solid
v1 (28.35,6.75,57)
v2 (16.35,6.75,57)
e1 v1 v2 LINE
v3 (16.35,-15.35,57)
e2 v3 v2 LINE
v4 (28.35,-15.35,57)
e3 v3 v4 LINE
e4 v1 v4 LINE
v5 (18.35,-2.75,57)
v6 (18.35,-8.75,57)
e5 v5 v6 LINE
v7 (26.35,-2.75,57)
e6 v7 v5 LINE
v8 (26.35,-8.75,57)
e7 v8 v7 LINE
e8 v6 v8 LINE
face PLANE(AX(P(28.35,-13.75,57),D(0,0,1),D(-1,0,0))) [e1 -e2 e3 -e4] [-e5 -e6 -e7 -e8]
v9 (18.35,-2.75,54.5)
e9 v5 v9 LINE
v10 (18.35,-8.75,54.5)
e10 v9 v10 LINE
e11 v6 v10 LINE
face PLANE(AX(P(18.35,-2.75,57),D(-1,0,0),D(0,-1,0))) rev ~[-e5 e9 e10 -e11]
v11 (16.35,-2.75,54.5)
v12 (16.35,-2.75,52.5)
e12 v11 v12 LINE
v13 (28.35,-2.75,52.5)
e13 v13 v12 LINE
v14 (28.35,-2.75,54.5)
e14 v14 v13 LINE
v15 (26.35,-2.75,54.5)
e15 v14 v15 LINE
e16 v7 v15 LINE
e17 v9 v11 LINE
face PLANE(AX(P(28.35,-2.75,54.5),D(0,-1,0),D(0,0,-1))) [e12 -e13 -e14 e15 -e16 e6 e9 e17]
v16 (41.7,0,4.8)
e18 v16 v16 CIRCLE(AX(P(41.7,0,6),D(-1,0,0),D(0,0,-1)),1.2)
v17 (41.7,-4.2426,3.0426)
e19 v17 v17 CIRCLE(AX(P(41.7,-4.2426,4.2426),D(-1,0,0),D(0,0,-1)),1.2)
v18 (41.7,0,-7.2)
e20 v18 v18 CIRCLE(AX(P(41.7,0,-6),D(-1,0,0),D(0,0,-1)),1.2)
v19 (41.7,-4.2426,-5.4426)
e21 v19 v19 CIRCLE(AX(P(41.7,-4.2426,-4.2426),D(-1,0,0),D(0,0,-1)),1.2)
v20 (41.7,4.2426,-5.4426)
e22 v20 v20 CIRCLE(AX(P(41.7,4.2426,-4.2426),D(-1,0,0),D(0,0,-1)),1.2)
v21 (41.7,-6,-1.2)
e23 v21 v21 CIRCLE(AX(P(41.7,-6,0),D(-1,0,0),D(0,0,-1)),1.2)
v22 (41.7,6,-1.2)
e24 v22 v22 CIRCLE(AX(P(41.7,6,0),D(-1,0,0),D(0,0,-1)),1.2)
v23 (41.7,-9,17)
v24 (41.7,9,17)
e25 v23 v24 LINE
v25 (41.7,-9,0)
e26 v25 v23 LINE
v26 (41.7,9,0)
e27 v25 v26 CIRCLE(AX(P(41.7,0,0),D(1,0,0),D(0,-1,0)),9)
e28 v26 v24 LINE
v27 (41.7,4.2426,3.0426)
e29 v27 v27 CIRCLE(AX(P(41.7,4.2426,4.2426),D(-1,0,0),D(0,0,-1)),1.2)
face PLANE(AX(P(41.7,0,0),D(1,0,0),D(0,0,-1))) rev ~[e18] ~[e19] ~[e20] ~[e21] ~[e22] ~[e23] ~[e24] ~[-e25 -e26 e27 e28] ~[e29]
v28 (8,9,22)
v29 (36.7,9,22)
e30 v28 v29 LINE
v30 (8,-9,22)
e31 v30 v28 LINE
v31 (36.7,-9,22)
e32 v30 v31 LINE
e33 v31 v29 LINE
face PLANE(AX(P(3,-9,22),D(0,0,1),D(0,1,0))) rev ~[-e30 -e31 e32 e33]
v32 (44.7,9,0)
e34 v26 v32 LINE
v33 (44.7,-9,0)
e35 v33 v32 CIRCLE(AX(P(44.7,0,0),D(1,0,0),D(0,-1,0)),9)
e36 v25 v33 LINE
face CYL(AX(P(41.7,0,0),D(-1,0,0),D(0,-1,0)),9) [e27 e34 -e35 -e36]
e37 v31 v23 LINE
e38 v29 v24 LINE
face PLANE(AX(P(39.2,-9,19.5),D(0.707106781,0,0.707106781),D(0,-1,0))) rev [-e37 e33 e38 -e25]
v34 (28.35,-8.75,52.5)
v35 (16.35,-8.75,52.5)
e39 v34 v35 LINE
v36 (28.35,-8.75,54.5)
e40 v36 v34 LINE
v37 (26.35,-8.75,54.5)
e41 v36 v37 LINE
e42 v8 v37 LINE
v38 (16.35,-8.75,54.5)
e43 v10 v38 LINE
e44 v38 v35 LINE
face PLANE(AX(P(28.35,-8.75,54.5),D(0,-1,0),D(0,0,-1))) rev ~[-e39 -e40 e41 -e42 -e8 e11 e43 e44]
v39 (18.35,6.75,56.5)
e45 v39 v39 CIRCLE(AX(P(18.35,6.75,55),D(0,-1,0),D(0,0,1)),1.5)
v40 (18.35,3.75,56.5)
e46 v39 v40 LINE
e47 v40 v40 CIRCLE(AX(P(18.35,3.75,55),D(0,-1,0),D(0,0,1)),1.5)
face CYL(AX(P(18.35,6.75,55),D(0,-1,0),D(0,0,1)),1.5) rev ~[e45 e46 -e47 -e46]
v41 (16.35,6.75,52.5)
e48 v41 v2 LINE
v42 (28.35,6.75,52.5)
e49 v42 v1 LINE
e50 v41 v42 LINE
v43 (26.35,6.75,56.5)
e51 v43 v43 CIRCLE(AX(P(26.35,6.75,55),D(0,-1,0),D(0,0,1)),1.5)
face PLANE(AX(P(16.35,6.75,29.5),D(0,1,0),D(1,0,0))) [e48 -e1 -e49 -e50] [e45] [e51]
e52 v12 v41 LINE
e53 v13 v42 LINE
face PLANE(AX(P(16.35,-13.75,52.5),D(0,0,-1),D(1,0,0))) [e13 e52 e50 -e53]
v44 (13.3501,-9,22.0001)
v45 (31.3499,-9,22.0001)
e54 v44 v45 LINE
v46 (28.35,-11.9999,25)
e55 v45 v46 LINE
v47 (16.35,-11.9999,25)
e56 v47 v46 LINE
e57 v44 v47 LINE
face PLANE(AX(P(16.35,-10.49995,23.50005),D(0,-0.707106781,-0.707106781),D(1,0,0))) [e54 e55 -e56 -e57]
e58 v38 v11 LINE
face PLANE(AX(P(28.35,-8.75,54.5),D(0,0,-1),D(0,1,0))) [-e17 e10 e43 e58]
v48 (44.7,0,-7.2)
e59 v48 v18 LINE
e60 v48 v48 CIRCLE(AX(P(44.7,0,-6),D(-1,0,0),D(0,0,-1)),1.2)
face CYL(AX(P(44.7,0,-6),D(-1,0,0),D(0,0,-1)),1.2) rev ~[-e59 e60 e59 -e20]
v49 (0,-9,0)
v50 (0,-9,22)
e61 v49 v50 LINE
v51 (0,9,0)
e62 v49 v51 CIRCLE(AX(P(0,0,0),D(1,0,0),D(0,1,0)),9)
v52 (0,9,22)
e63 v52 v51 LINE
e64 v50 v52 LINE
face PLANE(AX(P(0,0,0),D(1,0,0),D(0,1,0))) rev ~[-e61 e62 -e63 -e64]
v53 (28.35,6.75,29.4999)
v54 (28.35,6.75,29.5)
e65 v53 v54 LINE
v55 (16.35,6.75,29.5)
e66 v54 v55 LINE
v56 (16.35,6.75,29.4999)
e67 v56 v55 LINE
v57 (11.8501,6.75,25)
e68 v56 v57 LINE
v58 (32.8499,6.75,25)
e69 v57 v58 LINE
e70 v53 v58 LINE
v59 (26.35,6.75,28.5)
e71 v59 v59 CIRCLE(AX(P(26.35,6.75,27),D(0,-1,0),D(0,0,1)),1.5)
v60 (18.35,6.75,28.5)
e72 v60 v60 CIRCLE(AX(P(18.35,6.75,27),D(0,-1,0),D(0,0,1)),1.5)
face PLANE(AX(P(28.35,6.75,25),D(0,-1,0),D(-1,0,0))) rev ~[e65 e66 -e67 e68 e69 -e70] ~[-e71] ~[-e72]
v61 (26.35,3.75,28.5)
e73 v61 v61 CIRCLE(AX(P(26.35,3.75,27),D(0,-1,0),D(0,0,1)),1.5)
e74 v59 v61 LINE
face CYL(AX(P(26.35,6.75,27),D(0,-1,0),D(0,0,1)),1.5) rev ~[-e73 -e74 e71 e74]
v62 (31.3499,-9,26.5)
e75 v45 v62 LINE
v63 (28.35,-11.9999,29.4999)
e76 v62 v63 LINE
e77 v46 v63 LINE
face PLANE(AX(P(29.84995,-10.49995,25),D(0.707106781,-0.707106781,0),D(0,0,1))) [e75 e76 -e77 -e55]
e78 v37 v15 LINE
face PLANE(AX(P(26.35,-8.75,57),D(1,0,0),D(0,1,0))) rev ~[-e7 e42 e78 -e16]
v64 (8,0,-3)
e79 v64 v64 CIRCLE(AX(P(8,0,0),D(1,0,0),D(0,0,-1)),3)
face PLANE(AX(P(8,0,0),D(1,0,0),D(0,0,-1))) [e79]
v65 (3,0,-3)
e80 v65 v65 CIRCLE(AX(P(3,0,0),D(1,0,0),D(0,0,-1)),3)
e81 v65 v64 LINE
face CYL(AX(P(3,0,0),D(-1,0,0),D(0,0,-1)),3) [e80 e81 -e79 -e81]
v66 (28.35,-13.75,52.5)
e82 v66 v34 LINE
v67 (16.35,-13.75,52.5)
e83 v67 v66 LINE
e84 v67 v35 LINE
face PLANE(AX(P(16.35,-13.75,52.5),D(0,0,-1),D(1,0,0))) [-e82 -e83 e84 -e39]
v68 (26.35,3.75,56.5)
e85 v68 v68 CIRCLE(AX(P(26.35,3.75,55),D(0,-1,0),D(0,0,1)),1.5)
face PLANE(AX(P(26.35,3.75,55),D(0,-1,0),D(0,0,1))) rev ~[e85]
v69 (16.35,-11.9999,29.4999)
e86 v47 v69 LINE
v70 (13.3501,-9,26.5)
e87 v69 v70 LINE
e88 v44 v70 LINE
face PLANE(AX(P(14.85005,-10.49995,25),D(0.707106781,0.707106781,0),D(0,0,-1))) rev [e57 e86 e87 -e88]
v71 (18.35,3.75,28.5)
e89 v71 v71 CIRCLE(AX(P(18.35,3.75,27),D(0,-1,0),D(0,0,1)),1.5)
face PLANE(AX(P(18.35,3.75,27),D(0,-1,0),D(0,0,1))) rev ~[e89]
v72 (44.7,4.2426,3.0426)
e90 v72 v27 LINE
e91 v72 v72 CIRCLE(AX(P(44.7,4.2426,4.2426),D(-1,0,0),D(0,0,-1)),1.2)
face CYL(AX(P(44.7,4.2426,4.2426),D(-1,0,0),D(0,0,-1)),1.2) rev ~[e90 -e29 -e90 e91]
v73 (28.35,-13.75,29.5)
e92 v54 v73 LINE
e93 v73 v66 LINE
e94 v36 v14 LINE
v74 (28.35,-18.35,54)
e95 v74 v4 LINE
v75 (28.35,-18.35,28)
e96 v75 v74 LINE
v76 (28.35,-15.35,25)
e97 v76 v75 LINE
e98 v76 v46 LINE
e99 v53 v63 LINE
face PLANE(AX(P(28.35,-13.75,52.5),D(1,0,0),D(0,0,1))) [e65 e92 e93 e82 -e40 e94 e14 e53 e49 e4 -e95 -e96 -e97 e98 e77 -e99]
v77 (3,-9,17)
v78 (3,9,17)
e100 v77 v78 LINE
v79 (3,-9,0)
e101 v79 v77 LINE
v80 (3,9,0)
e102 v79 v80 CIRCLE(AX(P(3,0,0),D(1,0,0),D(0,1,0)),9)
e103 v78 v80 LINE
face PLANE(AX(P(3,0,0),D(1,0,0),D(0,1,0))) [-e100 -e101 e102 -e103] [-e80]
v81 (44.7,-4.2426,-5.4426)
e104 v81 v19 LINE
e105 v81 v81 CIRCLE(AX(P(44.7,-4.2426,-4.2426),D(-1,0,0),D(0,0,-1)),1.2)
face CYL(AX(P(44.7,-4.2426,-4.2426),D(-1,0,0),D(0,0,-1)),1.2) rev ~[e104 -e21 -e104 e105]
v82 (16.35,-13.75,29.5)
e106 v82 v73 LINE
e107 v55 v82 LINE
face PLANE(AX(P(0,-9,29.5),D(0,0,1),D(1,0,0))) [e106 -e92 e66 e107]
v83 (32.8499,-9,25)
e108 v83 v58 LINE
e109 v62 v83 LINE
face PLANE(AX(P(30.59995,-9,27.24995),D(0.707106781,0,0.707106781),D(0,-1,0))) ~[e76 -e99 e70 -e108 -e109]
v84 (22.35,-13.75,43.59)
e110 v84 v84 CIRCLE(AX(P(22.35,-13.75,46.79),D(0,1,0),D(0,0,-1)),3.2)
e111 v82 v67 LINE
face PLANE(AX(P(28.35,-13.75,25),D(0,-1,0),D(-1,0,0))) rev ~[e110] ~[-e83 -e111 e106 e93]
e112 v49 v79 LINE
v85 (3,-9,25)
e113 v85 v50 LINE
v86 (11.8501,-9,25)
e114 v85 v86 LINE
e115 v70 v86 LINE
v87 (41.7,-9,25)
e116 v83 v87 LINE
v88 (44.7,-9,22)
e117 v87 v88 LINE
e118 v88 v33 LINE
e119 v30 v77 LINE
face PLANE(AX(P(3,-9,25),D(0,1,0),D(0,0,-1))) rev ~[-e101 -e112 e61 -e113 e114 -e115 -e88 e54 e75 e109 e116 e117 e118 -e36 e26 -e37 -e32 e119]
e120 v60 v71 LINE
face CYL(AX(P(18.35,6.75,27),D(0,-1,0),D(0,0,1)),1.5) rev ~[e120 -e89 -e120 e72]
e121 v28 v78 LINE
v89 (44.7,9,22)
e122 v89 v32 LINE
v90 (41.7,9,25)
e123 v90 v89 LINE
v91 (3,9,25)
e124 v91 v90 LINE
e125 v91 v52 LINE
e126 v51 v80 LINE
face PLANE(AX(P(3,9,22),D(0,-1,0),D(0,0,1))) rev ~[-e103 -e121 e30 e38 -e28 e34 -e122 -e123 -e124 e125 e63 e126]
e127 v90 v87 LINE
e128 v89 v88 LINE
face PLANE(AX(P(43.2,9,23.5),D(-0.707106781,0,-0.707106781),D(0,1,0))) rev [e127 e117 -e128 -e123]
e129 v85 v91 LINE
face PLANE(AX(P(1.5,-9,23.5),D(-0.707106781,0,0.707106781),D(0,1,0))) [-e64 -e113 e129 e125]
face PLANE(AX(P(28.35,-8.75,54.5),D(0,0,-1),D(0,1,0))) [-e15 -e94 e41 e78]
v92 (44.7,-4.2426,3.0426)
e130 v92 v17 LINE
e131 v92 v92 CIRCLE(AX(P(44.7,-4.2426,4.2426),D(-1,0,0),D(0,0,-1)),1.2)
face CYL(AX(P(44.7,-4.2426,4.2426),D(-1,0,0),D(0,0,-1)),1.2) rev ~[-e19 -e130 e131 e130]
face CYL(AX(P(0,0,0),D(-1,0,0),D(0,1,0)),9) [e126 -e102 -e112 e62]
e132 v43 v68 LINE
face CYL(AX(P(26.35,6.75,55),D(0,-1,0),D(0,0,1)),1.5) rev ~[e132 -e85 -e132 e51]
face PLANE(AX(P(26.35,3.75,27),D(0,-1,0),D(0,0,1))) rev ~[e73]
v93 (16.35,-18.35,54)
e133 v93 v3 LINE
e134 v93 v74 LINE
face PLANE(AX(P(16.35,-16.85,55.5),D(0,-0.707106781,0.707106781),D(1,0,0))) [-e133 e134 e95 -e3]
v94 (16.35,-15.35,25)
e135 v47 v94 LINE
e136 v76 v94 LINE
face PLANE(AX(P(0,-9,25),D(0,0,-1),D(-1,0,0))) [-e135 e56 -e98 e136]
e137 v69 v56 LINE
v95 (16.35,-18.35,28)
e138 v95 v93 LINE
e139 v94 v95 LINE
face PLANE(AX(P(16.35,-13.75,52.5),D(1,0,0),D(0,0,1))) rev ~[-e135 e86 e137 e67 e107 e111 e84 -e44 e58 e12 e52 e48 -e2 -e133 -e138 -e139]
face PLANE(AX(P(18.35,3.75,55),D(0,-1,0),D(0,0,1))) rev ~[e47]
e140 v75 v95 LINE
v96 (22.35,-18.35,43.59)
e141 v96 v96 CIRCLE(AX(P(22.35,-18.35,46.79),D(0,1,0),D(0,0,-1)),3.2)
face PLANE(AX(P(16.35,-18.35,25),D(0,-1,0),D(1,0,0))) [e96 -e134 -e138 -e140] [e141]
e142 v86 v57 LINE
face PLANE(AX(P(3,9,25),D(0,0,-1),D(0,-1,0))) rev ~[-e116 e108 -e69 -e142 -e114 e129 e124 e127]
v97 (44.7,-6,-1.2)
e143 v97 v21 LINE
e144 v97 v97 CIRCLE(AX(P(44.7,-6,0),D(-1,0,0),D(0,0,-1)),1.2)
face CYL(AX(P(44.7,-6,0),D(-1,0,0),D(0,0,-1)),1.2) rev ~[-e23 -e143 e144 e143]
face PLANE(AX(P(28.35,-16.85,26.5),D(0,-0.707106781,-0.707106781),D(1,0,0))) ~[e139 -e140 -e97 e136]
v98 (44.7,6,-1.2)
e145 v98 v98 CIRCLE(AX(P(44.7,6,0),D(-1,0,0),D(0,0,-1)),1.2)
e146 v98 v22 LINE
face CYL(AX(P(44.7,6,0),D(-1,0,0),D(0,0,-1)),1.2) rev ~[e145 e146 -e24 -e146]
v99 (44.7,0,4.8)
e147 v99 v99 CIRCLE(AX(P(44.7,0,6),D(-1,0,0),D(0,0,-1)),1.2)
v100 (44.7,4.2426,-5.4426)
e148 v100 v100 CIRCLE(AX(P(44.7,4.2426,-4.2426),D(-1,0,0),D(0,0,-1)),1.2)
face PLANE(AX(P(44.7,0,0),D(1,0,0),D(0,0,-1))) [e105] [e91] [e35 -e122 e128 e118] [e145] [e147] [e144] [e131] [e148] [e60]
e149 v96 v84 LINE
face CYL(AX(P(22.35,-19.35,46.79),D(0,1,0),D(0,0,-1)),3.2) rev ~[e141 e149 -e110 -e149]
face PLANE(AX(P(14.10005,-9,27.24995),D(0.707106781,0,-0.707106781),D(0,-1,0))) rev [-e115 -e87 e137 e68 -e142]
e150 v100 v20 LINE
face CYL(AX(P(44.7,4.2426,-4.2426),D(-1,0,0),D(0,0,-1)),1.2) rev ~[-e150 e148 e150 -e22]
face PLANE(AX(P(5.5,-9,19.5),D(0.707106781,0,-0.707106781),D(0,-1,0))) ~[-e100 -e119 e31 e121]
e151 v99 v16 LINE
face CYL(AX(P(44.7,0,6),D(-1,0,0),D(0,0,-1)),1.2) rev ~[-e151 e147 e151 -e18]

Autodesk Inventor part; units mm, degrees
ref_plane "YZ Plane" through (0, 0, 0) normal (1, 0, 0) x (0, 1, 0)
ref_plane "XZ Plane" through (0, 0, 0) normal (0, 1, 0) x (-1, 0, 0)
ref_plane "XY Plane" through (0, 0, 0) normal (0, 0, 1) x (1, 0, 0)
sketch "スケッチ1" plane through (0, 0, 0) normal (1, 0, 0) x (0, 1, 0)
  circle A0 centre (0, 0) radius 9
  line L0 (9, 0) -> (-9, 0)
  line L1 (-9, 0) -> (-9, 25)
  line L2 (-9, 25) -> (9, 25)
  line L3 (9, 25) -> (9, 0)
  dimension "d0" = 18
  dimension "d1" = 25
  dimension "d2" = 18
extrude "押し出し1" add sketch "スケッチ1" along normal blind 3
sketch "スケッチ2" plane through (3, 0, 0) normal (1, 0, 0) x (0, 0, -1)
  line L0 (-25, 9) -> (-25, -9) projected
  line L1 (-25, -9) -> (-22, -9)
  line L2 (-22, -9) -> (-22, 9)
  line L3 (-22, 9) -> (-25, 9)
  line L4 (-25, 9) -> (-25, -9)
  line L5 (0, 9) -> (-25, 9) projected
  point P0 (0, 0)
  point P1 (-25, 9)
  dimension "d5" = 3
extrude "押し出し2" add sketch "スケッチ2" along normal blind 38.7
sketch "スケッチ3" plane through (41.7, 0, 0) normal (1, 0, 0) x (0, 0, -1)
  line L0 (-22, 9) -> (-22, -9) projected
  line L1 (-22, -9) -> (0, -9) projected
  arc A0 (0, -9) -> (0, 9) centre (0, 0) ccw projected
  line L2 (0, 9) -> (-22, 9) projected
  line L3 (-22, -9) -> (-22, 9) projected
  line L4 (-22, 9) -> (-25, 9) projected
  line L5 (-25, 9) -> (-25, -9) projected
  line L6 (-25, -9) -> (-22, -9) projected
extrude "押し出し3" add sketch "スケッチ3" along normal blind 3
sketch "スケッチ4" plane through (0, -9, 25) normal (0, 0, 1) x (1, 0, 0)
  line L0 (28.35, 22.75) -> (16.35, 22.75)
  line L1 (16.35, 22.75) -> (16.35, -4.75)
  line L2 (16.35, -4.75) -> (28.35, -4.75)
  line L3 (28.35, -4.75) -> (28.35, 22.75)
  line L4 (28.35, 22.75) -> (16.35, -4.75) construction
  line L5 (16.35, 22.75) -> (28.35, -4.75) construction
  line L6 (44.7, 18) -> (44.7, 0) projected
  line L7 (0, 0) -> (44.7, 0) projected
  line L8 (28.35, 15.75) -> (16.35, 15.75)
  point P0 (0, 9)
  point P1 (22.35, 9)
  dimension "d10" = 12
  dimension "d11" = 27.5
  dimension "d12" = 22.35
  dimension "d13" = 9
  dimension "d16" = 7
extrude "押し出し4" add sketch "スケッチ4" along normal blind 4.5 contours L3 L7 L1 L8 | L3 L2 L1 L7
sketch "スケッチ5" plane through (0, -9, 25) normal (0, 0, -1) x (-1, 0, 0)
  line L0 (-28.35, -4.75) -> (-28.35, 0) projected
  line L1 (-28.35, -4.75) -> (-16.35, -4.75)
  line L2 (-16.35, -4.75) -> (-16.35, -10.35)
  line L3 (-16.35, -10.35) -> (-28.35, -10.35)
  line L4 (-28.35, -10.35) -> (-28.35, -4.75)
  line L5 (-16.35, 15.75) -> (-16.35, -4.75) projected
  point P0 (0, 9)
  dimension "d17" = 5.6
extrude "押し出し5" add sketch "スケッチ5" against normal blind 32
sketch "スケッチ6" plane through (16.35, -13.75, 29.5) normal (0, 1, 0) x (1, 0, 0)
  line L0 (0, 0) -> (0, -27.5) projected
  line L1 (12, -27.5) -> (0, -27.5)
  line L2 (0, -27.5) -> (0, -23)
  line L3 (0, -23) -> (12, -23)
  line L4 (12, -23) -> (12, -27.5)
  line L5 (12, -27.5) -> (0, -27.5) projected
  line L6 (12, 0) -> (12, -27.5) projected
  point P0 (-16.35, 29.5)
  point P1 (6, -23)
  point P2 (0, -27.5)
  dimension "d20" = 4.5
extrude "押し出し6" add sketch "スケッチ6" along normal blind 20.5
sketch "スケッチ7" plane through (44.7, 0, 0) normal (1, 0, 0) x (0, 0, -1)
  circle A0 centre (0, 0) radius 6 construction
  line L0 (7.5318, 0) -> (-7.5318, 0) construction
  point P0 (-6, 0)
  point P1 (-4.2426, -4.2426)
  point P2 (0, -6)
  point P3 (4.2426, -4.2426)
  point P4 (6, 0)
  point P5 (4.2426, 4.2426)
  point P6 (0, 6)
  point P7 (-4.2426, 4.2426)
  dimension "d23" = 12
  dimension "d26" = 360
hole "穴1" at (44.7, 0, 6) at (44.7, -4.2426, 4.2426) at (44.7, -6, 0) at (44.7, -4.2426, -4.2426) at (44.7, 0, -6) at (44.7, 4.2426, -4.2426) at (44.7, 6, 0) at (44.7, 4.2426, 4.2426) direction (-1, 0, 0) diameter 2.4 depth 6.3 clearance for "Countersunk Flat Head Screw ISO 2009/7046" size "M2" standard "ISO"
sketch "スケッチ8" plane through (16.35, -19.35, 25) normal (0, -1, 0) x (1, 0, 0)
  line L0 (0, 32) -> (12, 32) construction
  line L1 (6, 32) -> (6, 0) construction
  line L2 (0, 0) -> (12, 0) construction
  point P0 (-16.35, -25)
  point P1 (6, 21.79)
  dimension "d35" = 10.21
hole "穴2" at (22.35, -19.35, 46.79) direction (0, 1, 0) diameter 6.4 depth 6.3
sketch "スケッチ9" plane through (16.35, -19.35, 25) normal (0, -1, 0) x (1, 0, 0)
  circle A0 centre (6, 21.79) radius 3.2 projected
  line L0 (12, 0) -> (0, 0) projected
  line L1 (12, 0) -> (12, 32) projected
  line L2 (0, 32) -> (12, 32) projected
  line L3 (0, 0) -> (0, 32) projected
  point P0 (-16.35, -25)
extrude "押し出し7" cut sketch "スケッチ9" against normal blind 1
sketch "スケッチ10" plane through (3, 0, 0) normal (1, 0, 0) x (0, 0, -1)
  circle A0 centre (0, 0) radius 3
  dimension "d45" = 6
extrude "押し出し8" add sketch "スケッチ10" along normal blind 5
sketch "スケッチ11" plane through (16.35, 6.75, 29.5) normal (0, 1, 0) x (1, 0, 0)
  circle A0 centre (6, -17.29) radius 3.2 projected
  line L0 (6, -51.8359) -> (6, 17.2559)
  line L1 (37.0866, -11.5) -> (-25.0866, -11.5)
  line L2 (0, -27.5) -> (12, -27.5) projected
  line L3 (-16.35, 4.5) -> (28.35, 4.5) projected
  point P0 (-16.35, 29.5)
  point P1 (6, -11.5)
  point P2 (10, 2.5)
  point P3 (2, 2.5)
  point P4 (10, -25.5)
  point P5 (2, -25.5)
  dimension "d48" = 16
  dimension "d49" = 8
  dimension "d50" = 2
hole "穴3" at (26.35, 6.75, 27) at (18.35, 6.75, 27) at (26.35, 6.75, 55) at (18.35, 6.75, 55) direction (0, -1, 0) diameter 3 depth 3
chamfer "面取り1" distance 5 angle 45 2 edges at (41.7, 0, 22) (3, 0, 22)
chamfer "面取り2" distance 3 angle 45 2 edges at (22.35, -18.35, 57) (22.35, -18.35, 25)
chamfer "面取り3" distance 4.5 angle 45 2 edges at (16.35, -1.125, 25) (28.35, -1.125, 25)
chamfer "面取り4" distance 3 angle 45 3 edges at (22.35, -9, 25) (16.35, -9, 27.2499) (28.35, -9, 27.2499)
chamfer "面取り5" distance 3 angle 45 2 edges at (0, 0, 25) (44.7, 0, 25)
sketch "スケッチ12" plane through (0, -9, 57) normal (0, 0, 1) x (1, 0, 0)
  point P0 (0, 9)
sketch "スケッチ13" plane through (0, -9, 57) normal (0, 0, 1) x (1, 0, 0)
  line L0 (26.35, 6.25) -> (18.35, 6.25)
  line L1 (18.35, 6.25) -> (18.35, 0.25)
  line L2 (18.35, 0.25) -> (26.35, 0.25)
  line L3 (26.35, 0.25) -> (26.35, 6.25)
  line L4 (26.35, 6.25) -> (18.35, 0.25) construction
  line L5 (18.35, 6.25) -> (26.35, 0.25) construction
  line L6 (16.35, -4.75) -> (28.35, -4.75) projected
  line L7 (28.35, -6.35) -> (28.35, 15.75) projected
  point P0 (0, 9)
  point P1 (22.35, 3.25)
  dimension "d73" = 6
  dimension "d74" = 8
  dimension "d75" = 5
  dimension "d76" = 6
extrude "押し出し9" cut sketch "スケッチ13" against normal blind 10
sketch "スケッチ14" plane through (28.35, -13.75, 52.5) normal (1, 0, 0) x (0, 0, -1)
  line L0 (0, 11) -> (0, 5) projected
  line L1 (-4.5, 11) -> (0, 11) projected
  line L2 (-4.5, 5) -> (-4.5, 11) projected
  line L3 (-4.5, 5) -> (0, 5) projected
  line L4 (-2, 5) -> (-2, 11)
  point P0 (52.5, 13.75)
  dimension "d79" = 2
extrude "押し出し10" cut sketch "スケッチ14" against normal through all contours L0 L3 L4 L1
properties part number "Arm1"
